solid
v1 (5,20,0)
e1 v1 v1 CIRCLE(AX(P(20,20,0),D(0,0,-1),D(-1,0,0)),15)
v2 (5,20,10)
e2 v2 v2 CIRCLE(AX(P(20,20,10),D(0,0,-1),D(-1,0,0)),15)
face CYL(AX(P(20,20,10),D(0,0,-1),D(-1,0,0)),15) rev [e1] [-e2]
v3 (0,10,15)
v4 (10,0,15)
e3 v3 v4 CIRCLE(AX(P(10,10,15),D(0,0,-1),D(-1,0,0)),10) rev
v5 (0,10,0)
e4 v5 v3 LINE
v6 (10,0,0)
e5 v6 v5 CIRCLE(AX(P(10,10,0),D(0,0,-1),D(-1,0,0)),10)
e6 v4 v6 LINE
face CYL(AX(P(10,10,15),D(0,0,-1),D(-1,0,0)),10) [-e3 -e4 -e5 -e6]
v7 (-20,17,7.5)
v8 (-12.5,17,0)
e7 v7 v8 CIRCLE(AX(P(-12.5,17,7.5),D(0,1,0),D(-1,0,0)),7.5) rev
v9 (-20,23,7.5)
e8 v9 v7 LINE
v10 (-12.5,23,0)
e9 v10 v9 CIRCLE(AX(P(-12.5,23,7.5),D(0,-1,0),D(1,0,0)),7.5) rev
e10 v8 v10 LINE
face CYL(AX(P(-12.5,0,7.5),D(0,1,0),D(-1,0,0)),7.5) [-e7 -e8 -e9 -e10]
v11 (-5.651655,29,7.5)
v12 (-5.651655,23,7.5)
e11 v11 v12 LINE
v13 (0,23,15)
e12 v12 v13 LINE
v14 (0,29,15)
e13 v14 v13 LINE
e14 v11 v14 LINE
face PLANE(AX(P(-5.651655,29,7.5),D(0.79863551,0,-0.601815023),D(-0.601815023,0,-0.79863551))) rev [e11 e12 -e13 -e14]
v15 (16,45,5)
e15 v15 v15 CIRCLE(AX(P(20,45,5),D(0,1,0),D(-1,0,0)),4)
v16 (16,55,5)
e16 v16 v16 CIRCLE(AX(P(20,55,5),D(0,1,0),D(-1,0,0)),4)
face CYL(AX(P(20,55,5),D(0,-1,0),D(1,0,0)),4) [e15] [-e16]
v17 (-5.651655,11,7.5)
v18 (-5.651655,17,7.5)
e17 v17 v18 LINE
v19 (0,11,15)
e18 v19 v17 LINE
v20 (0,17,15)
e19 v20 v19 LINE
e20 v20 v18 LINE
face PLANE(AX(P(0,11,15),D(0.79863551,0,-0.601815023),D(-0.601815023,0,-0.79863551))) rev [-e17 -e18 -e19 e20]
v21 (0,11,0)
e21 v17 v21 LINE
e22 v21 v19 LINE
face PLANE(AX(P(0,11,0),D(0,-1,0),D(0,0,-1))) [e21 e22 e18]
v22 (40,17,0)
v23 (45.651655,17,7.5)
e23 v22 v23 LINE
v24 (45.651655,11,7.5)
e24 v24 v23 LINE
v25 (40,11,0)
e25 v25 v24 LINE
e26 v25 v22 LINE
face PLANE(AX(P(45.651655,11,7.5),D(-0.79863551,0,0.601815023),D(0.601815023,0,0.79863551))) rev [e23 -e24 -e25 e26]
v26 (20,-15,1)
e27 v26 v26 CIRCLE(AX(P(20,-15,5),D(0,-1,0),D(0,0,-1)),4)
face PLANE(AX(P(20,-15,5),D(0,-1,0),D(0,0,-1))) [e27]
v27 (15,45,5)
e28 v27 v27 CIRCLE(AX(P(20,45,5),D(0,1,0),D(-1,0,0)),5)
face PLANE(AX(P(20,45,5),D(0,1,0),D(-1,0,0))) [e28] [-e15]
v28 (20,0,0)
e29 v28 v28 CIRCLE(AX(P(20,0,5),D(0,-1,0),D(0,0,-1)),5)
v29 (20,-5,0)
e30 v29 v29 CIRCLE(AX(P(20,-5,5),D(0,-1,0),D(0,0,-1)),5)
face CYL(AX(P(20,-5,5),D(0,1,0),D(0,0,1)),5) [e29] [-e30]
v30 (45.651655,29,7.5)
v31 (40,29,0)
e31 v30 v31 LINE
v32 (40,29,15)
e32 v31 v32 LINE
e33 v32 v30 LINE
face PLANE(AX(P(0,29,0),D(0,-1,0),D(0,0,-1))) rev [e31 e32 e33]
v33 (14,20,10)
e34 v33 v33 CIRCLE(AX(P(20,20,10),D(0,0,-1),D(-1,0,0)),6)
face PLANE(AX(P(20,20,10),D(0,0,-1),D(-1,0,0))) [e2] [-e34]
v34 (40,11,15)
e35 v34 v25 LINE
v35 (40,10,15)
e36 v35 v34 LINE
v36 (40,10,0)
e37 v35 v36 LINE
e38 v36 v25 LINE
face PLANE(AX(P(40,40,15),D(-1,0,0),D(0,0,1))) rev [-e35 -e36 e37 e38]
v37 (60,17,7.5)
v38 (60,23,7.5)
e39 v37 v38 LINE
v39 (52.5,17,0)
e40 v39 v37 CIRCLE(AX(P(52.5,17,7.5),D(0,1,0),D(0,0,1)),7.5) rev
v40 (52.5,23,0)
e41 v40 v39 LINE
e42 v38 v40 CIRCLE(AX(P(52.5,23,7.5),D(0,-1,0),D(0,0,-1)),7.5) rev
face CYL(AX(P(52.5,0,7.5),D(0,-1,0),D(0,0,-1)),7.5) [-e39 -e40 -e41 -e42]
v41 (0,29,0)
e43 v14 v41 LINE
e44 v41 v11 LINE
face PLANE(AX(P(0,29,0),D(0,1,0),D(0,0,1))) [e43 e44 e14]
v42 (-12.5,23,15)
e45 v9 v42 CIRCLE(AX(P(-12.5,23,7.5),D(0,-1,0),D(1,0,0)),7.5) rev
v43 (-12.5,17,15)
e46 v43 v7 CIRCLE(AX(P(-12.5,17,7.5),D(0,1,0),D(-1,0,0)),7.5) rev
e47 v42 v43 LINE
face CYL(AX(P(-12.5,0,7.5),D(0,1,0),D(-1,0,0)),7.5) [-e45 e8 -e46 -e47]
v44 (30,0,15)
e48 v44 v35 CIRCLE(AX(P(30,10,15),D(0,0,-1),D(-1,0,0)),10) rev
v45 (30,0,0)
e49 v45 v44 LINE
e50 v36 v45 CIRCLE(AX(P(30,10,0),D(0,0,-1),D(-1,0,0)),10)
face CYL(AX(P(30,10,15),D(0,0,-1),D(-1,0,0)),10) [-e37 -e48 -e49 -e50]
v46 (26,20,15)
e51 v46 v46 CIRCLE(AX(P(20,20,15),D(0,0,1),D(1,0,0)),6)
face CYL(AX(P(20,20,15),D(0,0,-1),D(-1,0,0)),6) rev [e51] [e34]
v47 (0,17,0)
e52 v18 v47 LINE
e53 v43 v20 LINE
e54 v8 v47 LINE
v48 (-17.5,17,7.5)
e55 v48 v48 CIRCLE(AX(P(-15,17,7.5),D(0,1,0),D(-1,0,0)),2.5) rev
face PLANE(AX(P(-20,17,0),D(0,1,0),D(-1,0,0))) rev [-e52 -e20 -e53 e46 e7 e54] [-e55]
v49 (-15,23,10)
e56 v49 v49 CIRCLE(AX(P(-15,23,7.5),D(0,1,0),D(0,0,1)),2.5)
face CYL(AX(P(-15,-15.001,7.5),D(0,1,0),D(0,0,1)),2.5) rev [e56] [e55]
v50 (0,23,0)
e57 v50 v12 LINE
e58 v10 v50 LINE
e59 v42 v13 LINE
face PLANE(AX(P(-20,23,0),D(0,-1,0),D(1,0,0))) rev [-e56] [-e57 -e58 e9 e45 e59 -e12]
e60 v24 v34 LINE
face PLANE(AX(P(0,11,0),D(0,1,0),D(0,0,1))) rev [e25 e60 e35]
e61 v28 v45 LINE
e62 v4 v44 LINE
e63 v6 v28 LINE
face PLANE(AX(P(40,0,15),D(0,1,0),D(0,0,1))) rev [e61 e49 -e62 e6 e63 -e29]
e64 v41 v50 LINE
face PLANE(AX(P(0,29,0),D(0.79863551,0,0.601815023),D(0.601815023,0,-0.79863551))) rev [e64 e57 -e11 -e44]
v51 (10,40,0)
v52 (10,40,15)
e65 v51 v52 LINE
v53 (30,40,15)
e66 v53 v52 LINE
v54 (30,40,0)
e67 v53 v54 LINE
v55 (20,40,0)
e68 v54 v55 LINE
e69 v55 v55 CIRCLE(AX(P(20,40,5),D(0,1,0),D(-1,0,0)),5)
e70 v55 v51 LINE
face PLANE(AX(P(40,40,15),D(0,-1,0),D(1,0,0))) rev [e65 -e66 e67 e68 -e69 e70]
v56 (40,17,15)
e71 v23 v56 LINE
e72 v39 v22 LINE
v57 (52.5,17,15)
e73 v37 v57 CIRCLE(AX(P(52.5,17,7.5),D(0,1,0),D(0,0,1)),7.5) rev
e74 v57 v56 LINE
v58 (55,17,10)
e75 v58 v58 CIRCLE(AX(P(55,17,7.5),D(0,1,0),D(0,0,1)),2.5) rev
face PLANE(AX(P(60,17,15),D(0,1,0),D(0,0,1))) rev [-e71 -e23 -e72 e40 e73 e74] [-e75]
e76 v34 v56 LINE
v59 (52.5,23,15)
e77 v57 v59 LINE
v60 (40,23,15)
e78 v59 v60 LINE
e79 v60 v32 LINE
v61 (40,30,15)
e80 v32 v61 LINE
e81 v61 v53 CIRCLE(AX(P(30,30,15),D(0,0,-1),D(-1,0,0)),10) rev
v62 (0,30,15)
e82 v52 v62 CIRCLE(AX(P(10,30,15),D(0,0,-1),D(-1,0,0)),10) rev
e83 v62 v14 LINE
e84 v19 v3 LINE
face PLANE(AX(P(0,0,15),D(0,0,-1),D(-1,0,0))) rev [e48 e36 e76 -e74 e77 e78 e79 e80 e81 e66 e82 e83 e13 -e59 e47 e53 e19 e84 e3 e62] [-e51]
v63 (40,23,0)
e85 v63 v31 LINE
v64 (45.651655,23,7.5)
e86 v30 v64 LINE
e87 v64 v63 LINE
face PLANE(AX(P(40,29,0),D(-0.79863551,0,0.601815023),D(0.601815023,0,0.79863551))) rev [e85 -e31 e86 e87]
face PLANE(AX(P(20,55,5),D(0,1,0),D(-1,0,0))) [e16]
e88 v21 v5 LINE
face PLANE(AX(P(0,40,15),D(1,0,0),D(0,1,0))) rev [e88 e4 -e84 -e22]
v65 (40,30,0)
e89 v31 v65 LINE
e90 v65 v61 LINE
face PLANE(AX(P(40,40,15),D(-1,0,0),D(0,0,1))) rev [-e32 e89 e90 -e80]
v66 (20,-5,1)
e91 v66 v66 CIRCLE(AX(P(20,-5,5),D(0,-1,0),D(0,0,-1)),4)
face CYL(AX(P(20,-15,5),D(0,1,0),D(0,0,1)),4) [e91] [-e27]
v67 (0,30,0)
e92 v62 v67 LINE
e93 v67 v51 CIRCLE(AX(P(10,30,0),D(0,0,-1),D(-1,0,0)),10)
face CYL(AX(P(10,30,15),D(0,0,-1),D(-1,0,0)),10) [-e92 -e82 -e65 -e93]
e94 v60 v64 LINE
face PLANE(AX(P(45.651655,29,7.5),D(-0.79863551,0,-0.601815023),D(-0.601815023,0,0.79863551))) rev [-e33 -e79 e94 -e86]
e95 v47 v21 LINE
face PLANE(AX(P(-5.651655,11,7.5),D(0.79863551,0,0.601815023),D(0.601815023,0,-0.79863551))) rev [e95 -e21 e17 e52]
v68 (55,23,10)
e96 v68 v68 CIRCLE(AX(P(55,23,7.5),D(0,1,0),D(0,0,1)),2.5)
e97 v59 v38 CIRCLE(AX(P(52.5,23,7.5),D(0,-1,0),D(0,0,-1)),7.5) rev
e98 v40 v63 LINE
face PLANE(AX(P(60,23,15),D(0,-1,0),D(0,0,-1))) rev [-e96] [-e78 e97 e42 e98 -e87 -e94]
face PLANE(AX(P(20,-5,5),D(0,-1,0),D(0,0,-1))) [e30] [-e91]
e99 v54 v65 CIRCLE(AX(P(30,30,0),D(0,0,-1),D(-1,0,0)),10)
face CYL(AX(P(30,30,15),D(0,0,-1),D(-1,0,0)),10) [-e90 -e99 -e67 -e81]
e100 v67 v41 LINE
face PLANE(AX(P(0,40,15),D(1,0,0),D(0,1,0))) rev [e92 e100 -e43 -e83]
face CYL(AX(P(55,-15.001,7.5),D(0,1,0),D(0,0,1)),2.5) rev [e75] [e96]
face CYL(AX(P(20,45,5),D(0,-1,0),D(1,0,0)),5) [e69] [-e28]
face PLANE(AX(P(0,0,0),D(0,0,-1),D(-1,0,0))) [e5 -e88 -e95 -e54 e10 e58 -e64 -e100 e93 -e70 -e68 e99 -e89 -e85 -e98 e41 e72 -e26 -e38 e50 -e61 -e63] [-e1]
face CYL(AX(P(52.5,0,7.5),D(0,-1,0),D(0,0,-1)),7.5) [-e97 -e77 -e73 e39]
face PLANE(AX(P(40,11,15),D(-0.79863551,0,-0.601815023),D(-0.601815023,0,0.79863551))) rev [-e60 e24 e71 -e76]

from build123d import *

# Parameters (mm, degrees)
SKETCH1_W           = 40
SKETCH1_H           = 40
SKETCH1_R           = 6
BOSS_EXTRUDE1_DEPTH = 15
SKETCH2_R           = 15
CUT_EXTRUDE1_DEPTH  = 10
SKETCH4_R           = 4
BOSS_EXTRUDE2_DEPTH = 15
SKETCH5_R           = 5
BOSS_EXTRUDE3_DEPTH = 5
BOSS_EXTRUDE4_START = 5
SKETCH7_R           = 5
BOSS_EXTRUDE4_DEPTH = 5
BOSS_EXTRUDE5_START = 10
SKETCH8_R           = 4
BOSS_EXTRUDE5_DEPTH = 10
FILLET1_R           = 10
SKETCH9_W           = 15
SKETCH9_H           = 6
BOSS_EXTRUDE6_DEPTH = 20
SKETCH10_W          = 15
SKETCH10_H          = 6
BOSS_EXTRUDE7_DEPTH = 20
CUT_EXTRUDE2_REACH  = 74.588
SKETCH11_R          = 2.5
FILLET2_R           = 7.5
BOSS_EXTRUDE8_DEPTH = 6
BOSS_EXTRUDE9_DEPTH = 6


with BuildPart() as part:
    # Sketch1 → Boss-Extrude1 (new body)
    with BuildSketch(Plane.XY):
        with Locations((20, 20)):
            Rectangle(SKETCH1_W, SKETCH1_H)
        with Locations((20, 20)):
            Circle(SKETCH1_R, mode=Mode.SUBTRACT)
    extrude(amount=BOSS_EXTRUDE1_DEPTH)

    # Sketch2 → Cut-Extrude1 (cut)
    with BuildSketch(Plane(origin=(0, 0, 0), x_dir=(-1, 0, 0), z_dir=(0, 0, -1))):
        with Locations((-20, 20)):
            Circle(SKETCH2_R)
    extrude(amount=-CUT_EXTRUDE1_DEPTH, mode=Mode.SUBTRACT)

    # Sketch4 → Boss-Extrude2 (add)
    with BuildSketch(Plane(origin=(0, 40, 0), x_dir=(1, 0, 0), z_dir=(0, 1, 0))):
        with Locations((20, -5)):
            Circle(SKETCH4_R)
    extrude(amount=BOSS_EXTRUDE2_DEPTH)

    # Sketch5 → Boss-Extrude3 (add)
    with BuildSketch(Plane(origin=(0, 40, 0), x_dir=(1, 0, 0), z_dir=(0, 1, 0))):
        with Locations(Location((20, -5, 0), (0, 0, 90))):
            Circle(SKETCH5_R)
    extrude(amount=BOSS_EXTRUDE3_DEPTH)

    # Sketch7 → Boss-Extrude4 (add)
    with BuildSketch(Plane.XZ.offset(BOSS_EXTRUDE4_START)):
        with Locations(Location((20, 5, 0), (0, 0, 270))):
            Circle(SKETCH7_R)
    extrude(amount=-BOSS_EXTRUDE4_DEPTH)

    # Sketch8 → Boss-Extrude5 (add)
    with BuildSketch(Plane.XZ.offset(5).offset(BOSS_EXTRUDE5_START)):
        with Locations(Location((20, 5, 0), (0, 0, 180))):
            Circle(SKETCH8_R)
    extrude(amount=-BOSS_EXTRUDE5_DEPTH)

    # Fillet1
    fillet1_edges = [part.edges().sort_by_distance(p)[0] for p in [
        (40, 0, 7.5),
        (0, 0, 7.5),
        (0, 40, 7.5),
        (40, 40, 7.5),
    ]]
    fillet(fillet1_edges, radius=FILLET1_R)

    # Sketch9 → Boss-Extrude6 (add)
    with BuildSketch(Plane(origin=(40, 0, 0), x_dir=(0, 0, -1), z_dir=(1, 0, 0))):
        with Locations((-7.5, 20)):
            Rectangle(SKETCH9_W, SKETCH9_H)
    extrude(amount=BOSS_EXTRUDE6_DEPTH)

    # Sketch10 → Boss-Extrude7 (add)
    with BuildSketch(Plane.ZY):
        with Locations((7.5, 20)):
            Rectangle(SKETCH10_W, SKETCH10_H)
    extrude(amount=BOSS_EXTRUDE7_DEPTH)

    # Sketch11 → Cut-Extrude2 (cut, up to next)
    with BuildSketch(Plane(origin=(0, 23, 0), x_dir=(1, 0, 0), z_dir=(0, 1, 0)), mode=Mode.PRIVATE) as cut_extrude2_sk1:
        with Locations(Location((-15, -7.5, 0), (0, 0, 270))):
            Circle(SKETCH11_R)
    cut_extrude2_tool1 = extrude(cut_extrude2_sk1.sketch, amount=-CUT_EXTRUDE2_REACH, mode=Mode.PRIVATE) & part.part
    # Sketch11 → Cut-Extrude2 (cut, up to next)
    with BuildSketch(Plane(origin=(0, 23, 0), x_dir=(1, 0, 0), z_dir=(0, 1, 0)), mode=Mode.PRIVATE) as cut_extrude2_sk2:
        with Locations(Location((55, -7.5, 0), (0, 0, 270))):
            Circle(SKETCH11_R)
    cut_extrude2_tool2 = extrude(cut_extrude2_sk2.sketch, amount=-CUT_EXTRUDE2_REACH, mode=Mode.PRIVATE) & part.part
    add(cut_extrude2_tool1.solids().sort_by_distance((-15, 23, 7.5))[0], mode=Mode.SUBTRACT)
    add(cut_extrude2_tool2.solids().sort_by_distance((55, 23, 7.5))[0], mode=Mode.SUBTRACT)

    # Fillet2
    fillet2_edges = [part.edges().sort_by_distance(p)[0] for p in [
        (-20, 20, 15),
        (-20, 20, 0),
        (60, 20, 15),
        (60, 20, 0),
    ]]
    fillet(fillet2_edges, radius=FILLET2_R - 0.0001)  # a hair under: the kernel refuses the full size

    # Sketch12 → Boss-Extrude8 (add)
    with BuildSketch(Plane(origin=(0, 23, 0), x_dir=(1, 0, 0), z_dir=(0, 1, 0))):
        Polygon((0, 0), (0, -15), (-5.651655376, -7.5), align=None)
        Polygon((45.651655376, -7.5), (40, -15), (40, 0), align=None)
    extrude(amount=BOSS_EXTRUDE8_DEPTH)

    # Sketch13 → Boss-Extrude9 (add)
    with BuildSketch(Plane.XZ.offset(-17)):
        Polygon((0, 15), (-5.651655376, 7.5), (0, 0), align=None)
        Polygon((40, 15), (45.651655376, 7.5), (40, 0), align=None)
    extrude(amount=BOSS_EXTRUDE9_DEPTH)


solid = part.part
